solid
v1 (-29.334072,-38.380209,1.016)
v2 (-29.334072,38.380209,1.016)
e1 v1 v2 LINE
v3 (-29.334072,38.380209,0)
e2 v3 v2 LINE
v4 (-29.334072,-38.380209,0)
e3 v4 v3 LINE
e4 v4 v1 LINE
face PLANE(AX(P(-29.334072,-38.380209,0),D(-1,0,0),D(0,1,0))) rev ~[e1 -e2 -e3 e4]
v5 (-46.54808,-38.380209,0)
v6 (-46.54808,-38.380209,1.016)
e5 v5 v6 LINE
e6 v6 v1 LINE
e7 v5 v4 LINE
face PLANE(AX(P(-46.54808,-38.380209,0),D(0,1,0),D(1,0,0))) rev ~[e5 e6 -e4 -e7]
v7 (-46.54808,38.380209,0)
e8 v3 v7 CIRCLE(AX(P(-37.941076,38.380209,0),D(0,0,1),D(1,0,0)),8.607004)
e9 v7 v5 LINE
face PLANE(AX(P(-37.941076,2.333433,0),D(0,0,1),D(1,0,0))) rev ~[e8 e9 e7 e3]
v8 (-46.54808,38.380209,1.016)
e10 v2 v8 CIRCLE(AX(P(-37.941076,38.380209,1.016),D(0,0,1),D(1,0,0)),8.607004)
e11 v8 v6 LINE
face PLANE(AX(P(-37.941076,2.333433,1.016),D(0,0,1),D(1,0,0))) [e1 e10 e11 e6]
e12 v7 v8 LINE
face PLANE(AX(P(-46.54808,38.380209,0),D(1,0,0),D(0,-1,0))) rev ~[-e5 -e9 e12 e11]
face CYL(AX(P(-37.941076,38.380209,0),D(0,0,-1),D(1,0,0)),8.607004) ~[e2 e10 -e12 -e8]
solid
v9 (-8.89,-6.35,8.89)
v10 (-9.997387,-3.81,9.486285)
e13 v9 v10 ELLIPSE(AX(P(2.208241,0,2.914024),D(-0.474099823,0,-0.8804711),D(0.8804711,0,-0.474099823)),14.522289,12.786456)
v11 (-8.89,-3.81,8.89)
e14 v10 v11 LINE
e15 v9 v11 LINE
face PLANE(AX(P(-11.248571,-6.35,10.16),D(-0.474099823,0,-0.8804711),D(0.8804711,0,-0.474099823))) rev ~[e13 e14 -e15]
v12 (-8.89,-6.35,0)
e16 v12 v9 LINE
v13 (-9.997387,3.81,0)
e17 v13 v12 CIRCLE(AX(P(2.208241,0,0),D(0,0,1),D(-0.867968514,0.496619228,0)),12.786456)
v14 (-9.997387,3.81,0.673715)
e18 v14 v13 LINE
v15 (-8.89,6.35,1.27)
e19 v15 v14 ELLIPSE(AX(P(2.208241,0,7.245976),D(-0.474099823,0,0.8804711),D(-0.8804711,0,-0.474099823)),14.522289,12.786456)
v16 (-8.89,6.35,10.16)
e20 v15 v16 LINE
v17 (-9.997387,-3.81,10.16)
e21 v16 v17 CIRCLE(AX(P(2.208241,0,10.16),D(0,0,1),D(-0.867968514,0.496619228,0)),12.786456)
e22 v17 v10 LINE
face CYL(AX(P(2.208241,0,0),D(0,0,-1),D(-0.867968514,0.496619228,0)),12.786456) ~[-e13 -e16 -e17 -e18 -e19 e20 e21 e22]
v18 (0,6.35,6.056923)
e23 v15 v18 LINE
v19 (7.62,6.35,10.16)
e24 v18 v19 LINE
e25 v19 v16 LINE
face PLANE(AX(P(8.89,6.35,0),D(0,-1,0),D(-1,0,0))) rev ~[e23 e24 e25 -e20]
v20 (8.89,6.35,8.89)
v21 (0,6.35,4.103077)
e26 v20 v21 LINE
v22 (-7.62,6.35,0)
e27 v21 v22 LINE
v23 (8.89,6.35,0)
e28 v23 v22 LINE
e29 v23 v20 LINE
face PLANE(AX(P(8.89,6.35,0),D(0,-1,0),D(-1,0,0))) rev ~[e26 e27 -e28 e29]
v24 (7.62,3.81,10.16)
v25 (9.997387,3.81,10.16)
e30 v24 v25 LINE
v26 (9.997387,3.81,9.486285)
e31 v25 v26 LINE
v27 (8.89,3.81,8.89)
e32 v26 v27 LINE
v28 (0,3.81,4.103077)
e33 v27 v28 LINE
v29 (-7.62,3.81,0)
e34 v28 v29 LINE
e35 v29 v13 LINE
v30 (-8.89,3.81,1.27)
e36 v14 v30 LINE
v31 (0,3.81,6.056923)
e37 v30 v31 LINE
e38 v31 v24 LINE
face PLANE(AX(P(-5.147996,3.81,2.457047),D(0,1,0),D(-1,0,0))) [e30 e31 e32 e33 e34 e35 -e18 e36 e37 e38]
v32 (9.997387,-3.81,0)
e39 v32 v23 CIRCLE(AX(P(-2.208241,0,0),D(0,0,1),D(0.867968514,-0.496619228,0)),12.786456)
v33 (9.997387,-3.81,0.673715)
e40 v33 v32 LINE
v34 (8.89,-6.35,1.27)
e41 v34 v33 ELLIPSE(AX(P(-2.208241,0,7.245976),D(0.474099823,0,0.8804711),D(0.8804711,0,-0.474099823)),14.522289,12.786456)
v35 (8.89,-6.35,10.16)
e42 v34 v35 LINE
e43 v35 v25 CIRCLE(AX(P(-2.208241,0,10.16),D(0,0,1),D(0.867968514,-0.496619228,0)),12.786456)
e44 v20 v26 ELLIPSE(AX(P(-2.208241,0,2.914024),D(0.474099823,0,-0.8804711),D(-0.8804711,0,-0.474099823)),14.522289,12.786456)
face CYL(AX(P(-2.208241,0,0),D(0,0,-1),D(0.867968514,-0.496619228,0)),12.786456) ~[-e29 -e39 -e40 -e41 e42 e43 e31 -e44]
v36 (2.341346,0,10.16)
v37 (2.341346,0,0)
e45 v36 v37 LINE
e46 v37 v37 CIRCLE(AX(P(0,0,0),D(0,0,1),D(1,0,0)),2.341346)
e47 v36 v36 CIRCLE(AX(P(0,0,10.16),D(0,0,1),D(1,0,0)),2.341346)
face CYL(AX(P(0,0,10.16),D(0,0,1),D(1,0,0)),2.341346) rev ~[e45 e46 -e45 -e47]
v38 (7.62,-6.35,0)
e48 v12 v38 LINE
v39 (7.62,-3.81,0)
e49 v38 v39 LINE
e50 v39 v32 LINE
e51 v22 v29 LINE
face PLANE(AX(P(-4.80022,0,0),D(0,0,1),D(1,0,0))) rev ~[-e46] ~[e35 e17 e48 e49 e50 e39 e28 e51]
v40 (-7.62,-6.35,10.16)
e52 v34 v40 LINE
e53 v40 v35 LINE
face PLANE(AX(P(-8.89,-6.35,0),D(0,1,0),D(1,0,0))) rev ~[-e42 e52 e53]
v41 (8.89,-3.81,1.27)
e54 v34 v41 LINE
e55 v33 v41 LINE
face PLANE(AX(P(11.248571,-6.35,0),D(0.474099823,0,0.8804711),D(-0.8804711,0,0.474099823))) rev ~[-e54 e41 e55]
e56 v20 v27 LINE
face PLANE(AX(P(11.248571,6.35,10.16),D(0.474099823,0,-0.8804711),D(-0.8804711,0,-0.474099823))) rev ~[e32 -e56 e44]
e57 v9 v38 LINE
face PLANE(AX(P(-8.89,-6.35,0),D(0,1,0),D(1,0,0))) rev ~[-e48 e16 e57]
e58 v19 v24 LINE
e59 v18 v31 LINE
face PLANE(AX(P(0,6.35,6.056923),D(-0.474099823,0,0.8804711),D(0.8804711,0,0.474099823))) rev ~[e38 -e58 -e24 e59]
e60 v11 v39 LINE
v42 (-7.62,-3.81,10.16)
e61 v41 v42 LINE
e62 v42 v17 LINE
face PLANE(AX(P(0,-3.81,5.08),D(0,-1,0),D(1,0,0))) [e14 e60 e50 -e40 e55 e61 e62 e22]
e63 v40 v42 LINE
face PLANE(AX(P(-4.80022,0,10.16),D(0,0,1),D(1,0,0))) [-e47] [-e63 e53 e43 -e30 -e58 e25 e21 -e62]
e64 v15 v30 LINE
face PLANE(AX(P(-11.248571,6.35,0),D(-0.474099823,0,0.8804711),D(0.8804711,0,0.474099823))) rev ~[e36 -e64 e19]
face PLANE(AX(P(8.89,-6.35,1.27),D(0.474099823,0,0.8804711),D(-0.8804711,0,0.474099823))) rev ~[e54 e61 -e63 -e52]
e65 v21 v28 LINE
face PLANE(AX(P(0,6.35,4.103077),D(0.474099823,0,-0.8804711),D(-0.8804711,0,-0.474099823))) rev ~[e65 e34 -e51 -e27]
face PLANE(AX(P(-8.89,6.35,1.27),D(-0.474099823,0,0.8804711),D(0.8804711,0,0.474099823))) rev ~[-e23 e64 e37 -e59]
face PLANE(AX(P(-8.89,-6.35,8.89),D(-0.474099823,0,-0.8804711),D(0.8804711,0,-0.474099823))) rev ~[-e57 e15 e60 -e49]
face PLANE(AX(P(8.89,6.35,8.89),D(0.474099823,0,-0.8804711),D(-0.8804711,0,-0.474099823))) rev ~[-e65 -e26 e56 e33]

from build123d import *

# Parameters (mm, degrees)
F1_DEPTH = 10.16
F3_DEPTH = 2.54
F5_DEPTH = 2.54
F6_R     = 2.341346142
F7_DEPTH = 10.161
F9_DEPTH = 1.016


# Not quite as in the source:
# - a feature names something its author has since deleted; it is built from what else it names


with BuildPart() as f1:
    # F0 (on Top) → F1 (new body)
    with BuildSketch(Plane.XY):
        with BuildLine():
            ThreePointArc((-8.89, 6.35), (-10.5782148046, 0), (-8.89, -6.35))
            Line((-8.89, -6.35), (0, -6.35))
            Line((0, -6.35), (0, 6.35))
            Line((0, 6.35), (-8.89, 6.35))
        make_face()
        with BuildLine():
            Line((0, 6.35), (0, -6.35))
            Line((0, -6.35), (8.89, -6.35))
            ThreePointArc((8.89, -6.35), (10.5782148046, 0), (8.89, 6.35))
            Line((8.89, 6.35), (0, 6.35))
        make_face()
    extrude(amount=F1_DEPTH)

    # F2 (on face) → F3 (cut)
    with BuildSketch(Plane.XZ.offset(6.35)):
        Polygon((11.2485714286, 0), (8.89, 1.27), (-7.62, 10.16), (-8.89, 10.16), (-11.2485714286, 10.16), (-8.89, 8.89), (7.62, 0), (8.89, 0), align=None)
    extrude(amount=-F3_DEPTH, mode=Mode.SUBTRACT)

    # F4 (on face) → F5 (cut)
    with BuildSketch(Plane(origin=(0, 6.35, 0), x_dir=(-1, 0, 0), z_dir=(0, 1, 0))):
        Polygon((8.89, 1.27), (0, 6.0569230769), (0, 4.1030769231), (7.62, 0), (11.2485714286, 0), align=None)
        Polygon((0, 4.1030769231), (0, 6.0569230769), (-7.62, 10.16), (-11.2485714286, 10.16), (-8.89, 8.89), align=None)
    extrude(amount=-F5_DEPTH, mode=Mode.SUBTRACT)

    # F6 (on face) → F7 (cut, through all)
    with BuildSketch(Plane.XY.offset(10.16)):
        Circle(F6_R)
    extrude(amount=-F7_DEPTH, mode=Mode.SUBTRACT)


with BuildPart() as f9:
    # F8 (on Top) → F9 (new body)
    with BuildSketch(Plane.XY):
        with BuildLine():
            Line((-46.5480796993, 38.3802093565), (-46.5480796993, -38.3802093565))
            Line((-46.5480796993, -38.3802093565), (-29.3340720236, -38.3802093565))
            Line((-29.3340720236, -38.3802093565), (-29.3340720236, 38.3802093565))
            ThreePointArc((-29.3340720236, 38.3802093565), (-37.9410758615, 46.9872131944), (-46.5480796993, 38.3802093565))
        make_face()
    extrude(amount=F9_DEPTH)


solid = Compound([f1.part, f9.part])
